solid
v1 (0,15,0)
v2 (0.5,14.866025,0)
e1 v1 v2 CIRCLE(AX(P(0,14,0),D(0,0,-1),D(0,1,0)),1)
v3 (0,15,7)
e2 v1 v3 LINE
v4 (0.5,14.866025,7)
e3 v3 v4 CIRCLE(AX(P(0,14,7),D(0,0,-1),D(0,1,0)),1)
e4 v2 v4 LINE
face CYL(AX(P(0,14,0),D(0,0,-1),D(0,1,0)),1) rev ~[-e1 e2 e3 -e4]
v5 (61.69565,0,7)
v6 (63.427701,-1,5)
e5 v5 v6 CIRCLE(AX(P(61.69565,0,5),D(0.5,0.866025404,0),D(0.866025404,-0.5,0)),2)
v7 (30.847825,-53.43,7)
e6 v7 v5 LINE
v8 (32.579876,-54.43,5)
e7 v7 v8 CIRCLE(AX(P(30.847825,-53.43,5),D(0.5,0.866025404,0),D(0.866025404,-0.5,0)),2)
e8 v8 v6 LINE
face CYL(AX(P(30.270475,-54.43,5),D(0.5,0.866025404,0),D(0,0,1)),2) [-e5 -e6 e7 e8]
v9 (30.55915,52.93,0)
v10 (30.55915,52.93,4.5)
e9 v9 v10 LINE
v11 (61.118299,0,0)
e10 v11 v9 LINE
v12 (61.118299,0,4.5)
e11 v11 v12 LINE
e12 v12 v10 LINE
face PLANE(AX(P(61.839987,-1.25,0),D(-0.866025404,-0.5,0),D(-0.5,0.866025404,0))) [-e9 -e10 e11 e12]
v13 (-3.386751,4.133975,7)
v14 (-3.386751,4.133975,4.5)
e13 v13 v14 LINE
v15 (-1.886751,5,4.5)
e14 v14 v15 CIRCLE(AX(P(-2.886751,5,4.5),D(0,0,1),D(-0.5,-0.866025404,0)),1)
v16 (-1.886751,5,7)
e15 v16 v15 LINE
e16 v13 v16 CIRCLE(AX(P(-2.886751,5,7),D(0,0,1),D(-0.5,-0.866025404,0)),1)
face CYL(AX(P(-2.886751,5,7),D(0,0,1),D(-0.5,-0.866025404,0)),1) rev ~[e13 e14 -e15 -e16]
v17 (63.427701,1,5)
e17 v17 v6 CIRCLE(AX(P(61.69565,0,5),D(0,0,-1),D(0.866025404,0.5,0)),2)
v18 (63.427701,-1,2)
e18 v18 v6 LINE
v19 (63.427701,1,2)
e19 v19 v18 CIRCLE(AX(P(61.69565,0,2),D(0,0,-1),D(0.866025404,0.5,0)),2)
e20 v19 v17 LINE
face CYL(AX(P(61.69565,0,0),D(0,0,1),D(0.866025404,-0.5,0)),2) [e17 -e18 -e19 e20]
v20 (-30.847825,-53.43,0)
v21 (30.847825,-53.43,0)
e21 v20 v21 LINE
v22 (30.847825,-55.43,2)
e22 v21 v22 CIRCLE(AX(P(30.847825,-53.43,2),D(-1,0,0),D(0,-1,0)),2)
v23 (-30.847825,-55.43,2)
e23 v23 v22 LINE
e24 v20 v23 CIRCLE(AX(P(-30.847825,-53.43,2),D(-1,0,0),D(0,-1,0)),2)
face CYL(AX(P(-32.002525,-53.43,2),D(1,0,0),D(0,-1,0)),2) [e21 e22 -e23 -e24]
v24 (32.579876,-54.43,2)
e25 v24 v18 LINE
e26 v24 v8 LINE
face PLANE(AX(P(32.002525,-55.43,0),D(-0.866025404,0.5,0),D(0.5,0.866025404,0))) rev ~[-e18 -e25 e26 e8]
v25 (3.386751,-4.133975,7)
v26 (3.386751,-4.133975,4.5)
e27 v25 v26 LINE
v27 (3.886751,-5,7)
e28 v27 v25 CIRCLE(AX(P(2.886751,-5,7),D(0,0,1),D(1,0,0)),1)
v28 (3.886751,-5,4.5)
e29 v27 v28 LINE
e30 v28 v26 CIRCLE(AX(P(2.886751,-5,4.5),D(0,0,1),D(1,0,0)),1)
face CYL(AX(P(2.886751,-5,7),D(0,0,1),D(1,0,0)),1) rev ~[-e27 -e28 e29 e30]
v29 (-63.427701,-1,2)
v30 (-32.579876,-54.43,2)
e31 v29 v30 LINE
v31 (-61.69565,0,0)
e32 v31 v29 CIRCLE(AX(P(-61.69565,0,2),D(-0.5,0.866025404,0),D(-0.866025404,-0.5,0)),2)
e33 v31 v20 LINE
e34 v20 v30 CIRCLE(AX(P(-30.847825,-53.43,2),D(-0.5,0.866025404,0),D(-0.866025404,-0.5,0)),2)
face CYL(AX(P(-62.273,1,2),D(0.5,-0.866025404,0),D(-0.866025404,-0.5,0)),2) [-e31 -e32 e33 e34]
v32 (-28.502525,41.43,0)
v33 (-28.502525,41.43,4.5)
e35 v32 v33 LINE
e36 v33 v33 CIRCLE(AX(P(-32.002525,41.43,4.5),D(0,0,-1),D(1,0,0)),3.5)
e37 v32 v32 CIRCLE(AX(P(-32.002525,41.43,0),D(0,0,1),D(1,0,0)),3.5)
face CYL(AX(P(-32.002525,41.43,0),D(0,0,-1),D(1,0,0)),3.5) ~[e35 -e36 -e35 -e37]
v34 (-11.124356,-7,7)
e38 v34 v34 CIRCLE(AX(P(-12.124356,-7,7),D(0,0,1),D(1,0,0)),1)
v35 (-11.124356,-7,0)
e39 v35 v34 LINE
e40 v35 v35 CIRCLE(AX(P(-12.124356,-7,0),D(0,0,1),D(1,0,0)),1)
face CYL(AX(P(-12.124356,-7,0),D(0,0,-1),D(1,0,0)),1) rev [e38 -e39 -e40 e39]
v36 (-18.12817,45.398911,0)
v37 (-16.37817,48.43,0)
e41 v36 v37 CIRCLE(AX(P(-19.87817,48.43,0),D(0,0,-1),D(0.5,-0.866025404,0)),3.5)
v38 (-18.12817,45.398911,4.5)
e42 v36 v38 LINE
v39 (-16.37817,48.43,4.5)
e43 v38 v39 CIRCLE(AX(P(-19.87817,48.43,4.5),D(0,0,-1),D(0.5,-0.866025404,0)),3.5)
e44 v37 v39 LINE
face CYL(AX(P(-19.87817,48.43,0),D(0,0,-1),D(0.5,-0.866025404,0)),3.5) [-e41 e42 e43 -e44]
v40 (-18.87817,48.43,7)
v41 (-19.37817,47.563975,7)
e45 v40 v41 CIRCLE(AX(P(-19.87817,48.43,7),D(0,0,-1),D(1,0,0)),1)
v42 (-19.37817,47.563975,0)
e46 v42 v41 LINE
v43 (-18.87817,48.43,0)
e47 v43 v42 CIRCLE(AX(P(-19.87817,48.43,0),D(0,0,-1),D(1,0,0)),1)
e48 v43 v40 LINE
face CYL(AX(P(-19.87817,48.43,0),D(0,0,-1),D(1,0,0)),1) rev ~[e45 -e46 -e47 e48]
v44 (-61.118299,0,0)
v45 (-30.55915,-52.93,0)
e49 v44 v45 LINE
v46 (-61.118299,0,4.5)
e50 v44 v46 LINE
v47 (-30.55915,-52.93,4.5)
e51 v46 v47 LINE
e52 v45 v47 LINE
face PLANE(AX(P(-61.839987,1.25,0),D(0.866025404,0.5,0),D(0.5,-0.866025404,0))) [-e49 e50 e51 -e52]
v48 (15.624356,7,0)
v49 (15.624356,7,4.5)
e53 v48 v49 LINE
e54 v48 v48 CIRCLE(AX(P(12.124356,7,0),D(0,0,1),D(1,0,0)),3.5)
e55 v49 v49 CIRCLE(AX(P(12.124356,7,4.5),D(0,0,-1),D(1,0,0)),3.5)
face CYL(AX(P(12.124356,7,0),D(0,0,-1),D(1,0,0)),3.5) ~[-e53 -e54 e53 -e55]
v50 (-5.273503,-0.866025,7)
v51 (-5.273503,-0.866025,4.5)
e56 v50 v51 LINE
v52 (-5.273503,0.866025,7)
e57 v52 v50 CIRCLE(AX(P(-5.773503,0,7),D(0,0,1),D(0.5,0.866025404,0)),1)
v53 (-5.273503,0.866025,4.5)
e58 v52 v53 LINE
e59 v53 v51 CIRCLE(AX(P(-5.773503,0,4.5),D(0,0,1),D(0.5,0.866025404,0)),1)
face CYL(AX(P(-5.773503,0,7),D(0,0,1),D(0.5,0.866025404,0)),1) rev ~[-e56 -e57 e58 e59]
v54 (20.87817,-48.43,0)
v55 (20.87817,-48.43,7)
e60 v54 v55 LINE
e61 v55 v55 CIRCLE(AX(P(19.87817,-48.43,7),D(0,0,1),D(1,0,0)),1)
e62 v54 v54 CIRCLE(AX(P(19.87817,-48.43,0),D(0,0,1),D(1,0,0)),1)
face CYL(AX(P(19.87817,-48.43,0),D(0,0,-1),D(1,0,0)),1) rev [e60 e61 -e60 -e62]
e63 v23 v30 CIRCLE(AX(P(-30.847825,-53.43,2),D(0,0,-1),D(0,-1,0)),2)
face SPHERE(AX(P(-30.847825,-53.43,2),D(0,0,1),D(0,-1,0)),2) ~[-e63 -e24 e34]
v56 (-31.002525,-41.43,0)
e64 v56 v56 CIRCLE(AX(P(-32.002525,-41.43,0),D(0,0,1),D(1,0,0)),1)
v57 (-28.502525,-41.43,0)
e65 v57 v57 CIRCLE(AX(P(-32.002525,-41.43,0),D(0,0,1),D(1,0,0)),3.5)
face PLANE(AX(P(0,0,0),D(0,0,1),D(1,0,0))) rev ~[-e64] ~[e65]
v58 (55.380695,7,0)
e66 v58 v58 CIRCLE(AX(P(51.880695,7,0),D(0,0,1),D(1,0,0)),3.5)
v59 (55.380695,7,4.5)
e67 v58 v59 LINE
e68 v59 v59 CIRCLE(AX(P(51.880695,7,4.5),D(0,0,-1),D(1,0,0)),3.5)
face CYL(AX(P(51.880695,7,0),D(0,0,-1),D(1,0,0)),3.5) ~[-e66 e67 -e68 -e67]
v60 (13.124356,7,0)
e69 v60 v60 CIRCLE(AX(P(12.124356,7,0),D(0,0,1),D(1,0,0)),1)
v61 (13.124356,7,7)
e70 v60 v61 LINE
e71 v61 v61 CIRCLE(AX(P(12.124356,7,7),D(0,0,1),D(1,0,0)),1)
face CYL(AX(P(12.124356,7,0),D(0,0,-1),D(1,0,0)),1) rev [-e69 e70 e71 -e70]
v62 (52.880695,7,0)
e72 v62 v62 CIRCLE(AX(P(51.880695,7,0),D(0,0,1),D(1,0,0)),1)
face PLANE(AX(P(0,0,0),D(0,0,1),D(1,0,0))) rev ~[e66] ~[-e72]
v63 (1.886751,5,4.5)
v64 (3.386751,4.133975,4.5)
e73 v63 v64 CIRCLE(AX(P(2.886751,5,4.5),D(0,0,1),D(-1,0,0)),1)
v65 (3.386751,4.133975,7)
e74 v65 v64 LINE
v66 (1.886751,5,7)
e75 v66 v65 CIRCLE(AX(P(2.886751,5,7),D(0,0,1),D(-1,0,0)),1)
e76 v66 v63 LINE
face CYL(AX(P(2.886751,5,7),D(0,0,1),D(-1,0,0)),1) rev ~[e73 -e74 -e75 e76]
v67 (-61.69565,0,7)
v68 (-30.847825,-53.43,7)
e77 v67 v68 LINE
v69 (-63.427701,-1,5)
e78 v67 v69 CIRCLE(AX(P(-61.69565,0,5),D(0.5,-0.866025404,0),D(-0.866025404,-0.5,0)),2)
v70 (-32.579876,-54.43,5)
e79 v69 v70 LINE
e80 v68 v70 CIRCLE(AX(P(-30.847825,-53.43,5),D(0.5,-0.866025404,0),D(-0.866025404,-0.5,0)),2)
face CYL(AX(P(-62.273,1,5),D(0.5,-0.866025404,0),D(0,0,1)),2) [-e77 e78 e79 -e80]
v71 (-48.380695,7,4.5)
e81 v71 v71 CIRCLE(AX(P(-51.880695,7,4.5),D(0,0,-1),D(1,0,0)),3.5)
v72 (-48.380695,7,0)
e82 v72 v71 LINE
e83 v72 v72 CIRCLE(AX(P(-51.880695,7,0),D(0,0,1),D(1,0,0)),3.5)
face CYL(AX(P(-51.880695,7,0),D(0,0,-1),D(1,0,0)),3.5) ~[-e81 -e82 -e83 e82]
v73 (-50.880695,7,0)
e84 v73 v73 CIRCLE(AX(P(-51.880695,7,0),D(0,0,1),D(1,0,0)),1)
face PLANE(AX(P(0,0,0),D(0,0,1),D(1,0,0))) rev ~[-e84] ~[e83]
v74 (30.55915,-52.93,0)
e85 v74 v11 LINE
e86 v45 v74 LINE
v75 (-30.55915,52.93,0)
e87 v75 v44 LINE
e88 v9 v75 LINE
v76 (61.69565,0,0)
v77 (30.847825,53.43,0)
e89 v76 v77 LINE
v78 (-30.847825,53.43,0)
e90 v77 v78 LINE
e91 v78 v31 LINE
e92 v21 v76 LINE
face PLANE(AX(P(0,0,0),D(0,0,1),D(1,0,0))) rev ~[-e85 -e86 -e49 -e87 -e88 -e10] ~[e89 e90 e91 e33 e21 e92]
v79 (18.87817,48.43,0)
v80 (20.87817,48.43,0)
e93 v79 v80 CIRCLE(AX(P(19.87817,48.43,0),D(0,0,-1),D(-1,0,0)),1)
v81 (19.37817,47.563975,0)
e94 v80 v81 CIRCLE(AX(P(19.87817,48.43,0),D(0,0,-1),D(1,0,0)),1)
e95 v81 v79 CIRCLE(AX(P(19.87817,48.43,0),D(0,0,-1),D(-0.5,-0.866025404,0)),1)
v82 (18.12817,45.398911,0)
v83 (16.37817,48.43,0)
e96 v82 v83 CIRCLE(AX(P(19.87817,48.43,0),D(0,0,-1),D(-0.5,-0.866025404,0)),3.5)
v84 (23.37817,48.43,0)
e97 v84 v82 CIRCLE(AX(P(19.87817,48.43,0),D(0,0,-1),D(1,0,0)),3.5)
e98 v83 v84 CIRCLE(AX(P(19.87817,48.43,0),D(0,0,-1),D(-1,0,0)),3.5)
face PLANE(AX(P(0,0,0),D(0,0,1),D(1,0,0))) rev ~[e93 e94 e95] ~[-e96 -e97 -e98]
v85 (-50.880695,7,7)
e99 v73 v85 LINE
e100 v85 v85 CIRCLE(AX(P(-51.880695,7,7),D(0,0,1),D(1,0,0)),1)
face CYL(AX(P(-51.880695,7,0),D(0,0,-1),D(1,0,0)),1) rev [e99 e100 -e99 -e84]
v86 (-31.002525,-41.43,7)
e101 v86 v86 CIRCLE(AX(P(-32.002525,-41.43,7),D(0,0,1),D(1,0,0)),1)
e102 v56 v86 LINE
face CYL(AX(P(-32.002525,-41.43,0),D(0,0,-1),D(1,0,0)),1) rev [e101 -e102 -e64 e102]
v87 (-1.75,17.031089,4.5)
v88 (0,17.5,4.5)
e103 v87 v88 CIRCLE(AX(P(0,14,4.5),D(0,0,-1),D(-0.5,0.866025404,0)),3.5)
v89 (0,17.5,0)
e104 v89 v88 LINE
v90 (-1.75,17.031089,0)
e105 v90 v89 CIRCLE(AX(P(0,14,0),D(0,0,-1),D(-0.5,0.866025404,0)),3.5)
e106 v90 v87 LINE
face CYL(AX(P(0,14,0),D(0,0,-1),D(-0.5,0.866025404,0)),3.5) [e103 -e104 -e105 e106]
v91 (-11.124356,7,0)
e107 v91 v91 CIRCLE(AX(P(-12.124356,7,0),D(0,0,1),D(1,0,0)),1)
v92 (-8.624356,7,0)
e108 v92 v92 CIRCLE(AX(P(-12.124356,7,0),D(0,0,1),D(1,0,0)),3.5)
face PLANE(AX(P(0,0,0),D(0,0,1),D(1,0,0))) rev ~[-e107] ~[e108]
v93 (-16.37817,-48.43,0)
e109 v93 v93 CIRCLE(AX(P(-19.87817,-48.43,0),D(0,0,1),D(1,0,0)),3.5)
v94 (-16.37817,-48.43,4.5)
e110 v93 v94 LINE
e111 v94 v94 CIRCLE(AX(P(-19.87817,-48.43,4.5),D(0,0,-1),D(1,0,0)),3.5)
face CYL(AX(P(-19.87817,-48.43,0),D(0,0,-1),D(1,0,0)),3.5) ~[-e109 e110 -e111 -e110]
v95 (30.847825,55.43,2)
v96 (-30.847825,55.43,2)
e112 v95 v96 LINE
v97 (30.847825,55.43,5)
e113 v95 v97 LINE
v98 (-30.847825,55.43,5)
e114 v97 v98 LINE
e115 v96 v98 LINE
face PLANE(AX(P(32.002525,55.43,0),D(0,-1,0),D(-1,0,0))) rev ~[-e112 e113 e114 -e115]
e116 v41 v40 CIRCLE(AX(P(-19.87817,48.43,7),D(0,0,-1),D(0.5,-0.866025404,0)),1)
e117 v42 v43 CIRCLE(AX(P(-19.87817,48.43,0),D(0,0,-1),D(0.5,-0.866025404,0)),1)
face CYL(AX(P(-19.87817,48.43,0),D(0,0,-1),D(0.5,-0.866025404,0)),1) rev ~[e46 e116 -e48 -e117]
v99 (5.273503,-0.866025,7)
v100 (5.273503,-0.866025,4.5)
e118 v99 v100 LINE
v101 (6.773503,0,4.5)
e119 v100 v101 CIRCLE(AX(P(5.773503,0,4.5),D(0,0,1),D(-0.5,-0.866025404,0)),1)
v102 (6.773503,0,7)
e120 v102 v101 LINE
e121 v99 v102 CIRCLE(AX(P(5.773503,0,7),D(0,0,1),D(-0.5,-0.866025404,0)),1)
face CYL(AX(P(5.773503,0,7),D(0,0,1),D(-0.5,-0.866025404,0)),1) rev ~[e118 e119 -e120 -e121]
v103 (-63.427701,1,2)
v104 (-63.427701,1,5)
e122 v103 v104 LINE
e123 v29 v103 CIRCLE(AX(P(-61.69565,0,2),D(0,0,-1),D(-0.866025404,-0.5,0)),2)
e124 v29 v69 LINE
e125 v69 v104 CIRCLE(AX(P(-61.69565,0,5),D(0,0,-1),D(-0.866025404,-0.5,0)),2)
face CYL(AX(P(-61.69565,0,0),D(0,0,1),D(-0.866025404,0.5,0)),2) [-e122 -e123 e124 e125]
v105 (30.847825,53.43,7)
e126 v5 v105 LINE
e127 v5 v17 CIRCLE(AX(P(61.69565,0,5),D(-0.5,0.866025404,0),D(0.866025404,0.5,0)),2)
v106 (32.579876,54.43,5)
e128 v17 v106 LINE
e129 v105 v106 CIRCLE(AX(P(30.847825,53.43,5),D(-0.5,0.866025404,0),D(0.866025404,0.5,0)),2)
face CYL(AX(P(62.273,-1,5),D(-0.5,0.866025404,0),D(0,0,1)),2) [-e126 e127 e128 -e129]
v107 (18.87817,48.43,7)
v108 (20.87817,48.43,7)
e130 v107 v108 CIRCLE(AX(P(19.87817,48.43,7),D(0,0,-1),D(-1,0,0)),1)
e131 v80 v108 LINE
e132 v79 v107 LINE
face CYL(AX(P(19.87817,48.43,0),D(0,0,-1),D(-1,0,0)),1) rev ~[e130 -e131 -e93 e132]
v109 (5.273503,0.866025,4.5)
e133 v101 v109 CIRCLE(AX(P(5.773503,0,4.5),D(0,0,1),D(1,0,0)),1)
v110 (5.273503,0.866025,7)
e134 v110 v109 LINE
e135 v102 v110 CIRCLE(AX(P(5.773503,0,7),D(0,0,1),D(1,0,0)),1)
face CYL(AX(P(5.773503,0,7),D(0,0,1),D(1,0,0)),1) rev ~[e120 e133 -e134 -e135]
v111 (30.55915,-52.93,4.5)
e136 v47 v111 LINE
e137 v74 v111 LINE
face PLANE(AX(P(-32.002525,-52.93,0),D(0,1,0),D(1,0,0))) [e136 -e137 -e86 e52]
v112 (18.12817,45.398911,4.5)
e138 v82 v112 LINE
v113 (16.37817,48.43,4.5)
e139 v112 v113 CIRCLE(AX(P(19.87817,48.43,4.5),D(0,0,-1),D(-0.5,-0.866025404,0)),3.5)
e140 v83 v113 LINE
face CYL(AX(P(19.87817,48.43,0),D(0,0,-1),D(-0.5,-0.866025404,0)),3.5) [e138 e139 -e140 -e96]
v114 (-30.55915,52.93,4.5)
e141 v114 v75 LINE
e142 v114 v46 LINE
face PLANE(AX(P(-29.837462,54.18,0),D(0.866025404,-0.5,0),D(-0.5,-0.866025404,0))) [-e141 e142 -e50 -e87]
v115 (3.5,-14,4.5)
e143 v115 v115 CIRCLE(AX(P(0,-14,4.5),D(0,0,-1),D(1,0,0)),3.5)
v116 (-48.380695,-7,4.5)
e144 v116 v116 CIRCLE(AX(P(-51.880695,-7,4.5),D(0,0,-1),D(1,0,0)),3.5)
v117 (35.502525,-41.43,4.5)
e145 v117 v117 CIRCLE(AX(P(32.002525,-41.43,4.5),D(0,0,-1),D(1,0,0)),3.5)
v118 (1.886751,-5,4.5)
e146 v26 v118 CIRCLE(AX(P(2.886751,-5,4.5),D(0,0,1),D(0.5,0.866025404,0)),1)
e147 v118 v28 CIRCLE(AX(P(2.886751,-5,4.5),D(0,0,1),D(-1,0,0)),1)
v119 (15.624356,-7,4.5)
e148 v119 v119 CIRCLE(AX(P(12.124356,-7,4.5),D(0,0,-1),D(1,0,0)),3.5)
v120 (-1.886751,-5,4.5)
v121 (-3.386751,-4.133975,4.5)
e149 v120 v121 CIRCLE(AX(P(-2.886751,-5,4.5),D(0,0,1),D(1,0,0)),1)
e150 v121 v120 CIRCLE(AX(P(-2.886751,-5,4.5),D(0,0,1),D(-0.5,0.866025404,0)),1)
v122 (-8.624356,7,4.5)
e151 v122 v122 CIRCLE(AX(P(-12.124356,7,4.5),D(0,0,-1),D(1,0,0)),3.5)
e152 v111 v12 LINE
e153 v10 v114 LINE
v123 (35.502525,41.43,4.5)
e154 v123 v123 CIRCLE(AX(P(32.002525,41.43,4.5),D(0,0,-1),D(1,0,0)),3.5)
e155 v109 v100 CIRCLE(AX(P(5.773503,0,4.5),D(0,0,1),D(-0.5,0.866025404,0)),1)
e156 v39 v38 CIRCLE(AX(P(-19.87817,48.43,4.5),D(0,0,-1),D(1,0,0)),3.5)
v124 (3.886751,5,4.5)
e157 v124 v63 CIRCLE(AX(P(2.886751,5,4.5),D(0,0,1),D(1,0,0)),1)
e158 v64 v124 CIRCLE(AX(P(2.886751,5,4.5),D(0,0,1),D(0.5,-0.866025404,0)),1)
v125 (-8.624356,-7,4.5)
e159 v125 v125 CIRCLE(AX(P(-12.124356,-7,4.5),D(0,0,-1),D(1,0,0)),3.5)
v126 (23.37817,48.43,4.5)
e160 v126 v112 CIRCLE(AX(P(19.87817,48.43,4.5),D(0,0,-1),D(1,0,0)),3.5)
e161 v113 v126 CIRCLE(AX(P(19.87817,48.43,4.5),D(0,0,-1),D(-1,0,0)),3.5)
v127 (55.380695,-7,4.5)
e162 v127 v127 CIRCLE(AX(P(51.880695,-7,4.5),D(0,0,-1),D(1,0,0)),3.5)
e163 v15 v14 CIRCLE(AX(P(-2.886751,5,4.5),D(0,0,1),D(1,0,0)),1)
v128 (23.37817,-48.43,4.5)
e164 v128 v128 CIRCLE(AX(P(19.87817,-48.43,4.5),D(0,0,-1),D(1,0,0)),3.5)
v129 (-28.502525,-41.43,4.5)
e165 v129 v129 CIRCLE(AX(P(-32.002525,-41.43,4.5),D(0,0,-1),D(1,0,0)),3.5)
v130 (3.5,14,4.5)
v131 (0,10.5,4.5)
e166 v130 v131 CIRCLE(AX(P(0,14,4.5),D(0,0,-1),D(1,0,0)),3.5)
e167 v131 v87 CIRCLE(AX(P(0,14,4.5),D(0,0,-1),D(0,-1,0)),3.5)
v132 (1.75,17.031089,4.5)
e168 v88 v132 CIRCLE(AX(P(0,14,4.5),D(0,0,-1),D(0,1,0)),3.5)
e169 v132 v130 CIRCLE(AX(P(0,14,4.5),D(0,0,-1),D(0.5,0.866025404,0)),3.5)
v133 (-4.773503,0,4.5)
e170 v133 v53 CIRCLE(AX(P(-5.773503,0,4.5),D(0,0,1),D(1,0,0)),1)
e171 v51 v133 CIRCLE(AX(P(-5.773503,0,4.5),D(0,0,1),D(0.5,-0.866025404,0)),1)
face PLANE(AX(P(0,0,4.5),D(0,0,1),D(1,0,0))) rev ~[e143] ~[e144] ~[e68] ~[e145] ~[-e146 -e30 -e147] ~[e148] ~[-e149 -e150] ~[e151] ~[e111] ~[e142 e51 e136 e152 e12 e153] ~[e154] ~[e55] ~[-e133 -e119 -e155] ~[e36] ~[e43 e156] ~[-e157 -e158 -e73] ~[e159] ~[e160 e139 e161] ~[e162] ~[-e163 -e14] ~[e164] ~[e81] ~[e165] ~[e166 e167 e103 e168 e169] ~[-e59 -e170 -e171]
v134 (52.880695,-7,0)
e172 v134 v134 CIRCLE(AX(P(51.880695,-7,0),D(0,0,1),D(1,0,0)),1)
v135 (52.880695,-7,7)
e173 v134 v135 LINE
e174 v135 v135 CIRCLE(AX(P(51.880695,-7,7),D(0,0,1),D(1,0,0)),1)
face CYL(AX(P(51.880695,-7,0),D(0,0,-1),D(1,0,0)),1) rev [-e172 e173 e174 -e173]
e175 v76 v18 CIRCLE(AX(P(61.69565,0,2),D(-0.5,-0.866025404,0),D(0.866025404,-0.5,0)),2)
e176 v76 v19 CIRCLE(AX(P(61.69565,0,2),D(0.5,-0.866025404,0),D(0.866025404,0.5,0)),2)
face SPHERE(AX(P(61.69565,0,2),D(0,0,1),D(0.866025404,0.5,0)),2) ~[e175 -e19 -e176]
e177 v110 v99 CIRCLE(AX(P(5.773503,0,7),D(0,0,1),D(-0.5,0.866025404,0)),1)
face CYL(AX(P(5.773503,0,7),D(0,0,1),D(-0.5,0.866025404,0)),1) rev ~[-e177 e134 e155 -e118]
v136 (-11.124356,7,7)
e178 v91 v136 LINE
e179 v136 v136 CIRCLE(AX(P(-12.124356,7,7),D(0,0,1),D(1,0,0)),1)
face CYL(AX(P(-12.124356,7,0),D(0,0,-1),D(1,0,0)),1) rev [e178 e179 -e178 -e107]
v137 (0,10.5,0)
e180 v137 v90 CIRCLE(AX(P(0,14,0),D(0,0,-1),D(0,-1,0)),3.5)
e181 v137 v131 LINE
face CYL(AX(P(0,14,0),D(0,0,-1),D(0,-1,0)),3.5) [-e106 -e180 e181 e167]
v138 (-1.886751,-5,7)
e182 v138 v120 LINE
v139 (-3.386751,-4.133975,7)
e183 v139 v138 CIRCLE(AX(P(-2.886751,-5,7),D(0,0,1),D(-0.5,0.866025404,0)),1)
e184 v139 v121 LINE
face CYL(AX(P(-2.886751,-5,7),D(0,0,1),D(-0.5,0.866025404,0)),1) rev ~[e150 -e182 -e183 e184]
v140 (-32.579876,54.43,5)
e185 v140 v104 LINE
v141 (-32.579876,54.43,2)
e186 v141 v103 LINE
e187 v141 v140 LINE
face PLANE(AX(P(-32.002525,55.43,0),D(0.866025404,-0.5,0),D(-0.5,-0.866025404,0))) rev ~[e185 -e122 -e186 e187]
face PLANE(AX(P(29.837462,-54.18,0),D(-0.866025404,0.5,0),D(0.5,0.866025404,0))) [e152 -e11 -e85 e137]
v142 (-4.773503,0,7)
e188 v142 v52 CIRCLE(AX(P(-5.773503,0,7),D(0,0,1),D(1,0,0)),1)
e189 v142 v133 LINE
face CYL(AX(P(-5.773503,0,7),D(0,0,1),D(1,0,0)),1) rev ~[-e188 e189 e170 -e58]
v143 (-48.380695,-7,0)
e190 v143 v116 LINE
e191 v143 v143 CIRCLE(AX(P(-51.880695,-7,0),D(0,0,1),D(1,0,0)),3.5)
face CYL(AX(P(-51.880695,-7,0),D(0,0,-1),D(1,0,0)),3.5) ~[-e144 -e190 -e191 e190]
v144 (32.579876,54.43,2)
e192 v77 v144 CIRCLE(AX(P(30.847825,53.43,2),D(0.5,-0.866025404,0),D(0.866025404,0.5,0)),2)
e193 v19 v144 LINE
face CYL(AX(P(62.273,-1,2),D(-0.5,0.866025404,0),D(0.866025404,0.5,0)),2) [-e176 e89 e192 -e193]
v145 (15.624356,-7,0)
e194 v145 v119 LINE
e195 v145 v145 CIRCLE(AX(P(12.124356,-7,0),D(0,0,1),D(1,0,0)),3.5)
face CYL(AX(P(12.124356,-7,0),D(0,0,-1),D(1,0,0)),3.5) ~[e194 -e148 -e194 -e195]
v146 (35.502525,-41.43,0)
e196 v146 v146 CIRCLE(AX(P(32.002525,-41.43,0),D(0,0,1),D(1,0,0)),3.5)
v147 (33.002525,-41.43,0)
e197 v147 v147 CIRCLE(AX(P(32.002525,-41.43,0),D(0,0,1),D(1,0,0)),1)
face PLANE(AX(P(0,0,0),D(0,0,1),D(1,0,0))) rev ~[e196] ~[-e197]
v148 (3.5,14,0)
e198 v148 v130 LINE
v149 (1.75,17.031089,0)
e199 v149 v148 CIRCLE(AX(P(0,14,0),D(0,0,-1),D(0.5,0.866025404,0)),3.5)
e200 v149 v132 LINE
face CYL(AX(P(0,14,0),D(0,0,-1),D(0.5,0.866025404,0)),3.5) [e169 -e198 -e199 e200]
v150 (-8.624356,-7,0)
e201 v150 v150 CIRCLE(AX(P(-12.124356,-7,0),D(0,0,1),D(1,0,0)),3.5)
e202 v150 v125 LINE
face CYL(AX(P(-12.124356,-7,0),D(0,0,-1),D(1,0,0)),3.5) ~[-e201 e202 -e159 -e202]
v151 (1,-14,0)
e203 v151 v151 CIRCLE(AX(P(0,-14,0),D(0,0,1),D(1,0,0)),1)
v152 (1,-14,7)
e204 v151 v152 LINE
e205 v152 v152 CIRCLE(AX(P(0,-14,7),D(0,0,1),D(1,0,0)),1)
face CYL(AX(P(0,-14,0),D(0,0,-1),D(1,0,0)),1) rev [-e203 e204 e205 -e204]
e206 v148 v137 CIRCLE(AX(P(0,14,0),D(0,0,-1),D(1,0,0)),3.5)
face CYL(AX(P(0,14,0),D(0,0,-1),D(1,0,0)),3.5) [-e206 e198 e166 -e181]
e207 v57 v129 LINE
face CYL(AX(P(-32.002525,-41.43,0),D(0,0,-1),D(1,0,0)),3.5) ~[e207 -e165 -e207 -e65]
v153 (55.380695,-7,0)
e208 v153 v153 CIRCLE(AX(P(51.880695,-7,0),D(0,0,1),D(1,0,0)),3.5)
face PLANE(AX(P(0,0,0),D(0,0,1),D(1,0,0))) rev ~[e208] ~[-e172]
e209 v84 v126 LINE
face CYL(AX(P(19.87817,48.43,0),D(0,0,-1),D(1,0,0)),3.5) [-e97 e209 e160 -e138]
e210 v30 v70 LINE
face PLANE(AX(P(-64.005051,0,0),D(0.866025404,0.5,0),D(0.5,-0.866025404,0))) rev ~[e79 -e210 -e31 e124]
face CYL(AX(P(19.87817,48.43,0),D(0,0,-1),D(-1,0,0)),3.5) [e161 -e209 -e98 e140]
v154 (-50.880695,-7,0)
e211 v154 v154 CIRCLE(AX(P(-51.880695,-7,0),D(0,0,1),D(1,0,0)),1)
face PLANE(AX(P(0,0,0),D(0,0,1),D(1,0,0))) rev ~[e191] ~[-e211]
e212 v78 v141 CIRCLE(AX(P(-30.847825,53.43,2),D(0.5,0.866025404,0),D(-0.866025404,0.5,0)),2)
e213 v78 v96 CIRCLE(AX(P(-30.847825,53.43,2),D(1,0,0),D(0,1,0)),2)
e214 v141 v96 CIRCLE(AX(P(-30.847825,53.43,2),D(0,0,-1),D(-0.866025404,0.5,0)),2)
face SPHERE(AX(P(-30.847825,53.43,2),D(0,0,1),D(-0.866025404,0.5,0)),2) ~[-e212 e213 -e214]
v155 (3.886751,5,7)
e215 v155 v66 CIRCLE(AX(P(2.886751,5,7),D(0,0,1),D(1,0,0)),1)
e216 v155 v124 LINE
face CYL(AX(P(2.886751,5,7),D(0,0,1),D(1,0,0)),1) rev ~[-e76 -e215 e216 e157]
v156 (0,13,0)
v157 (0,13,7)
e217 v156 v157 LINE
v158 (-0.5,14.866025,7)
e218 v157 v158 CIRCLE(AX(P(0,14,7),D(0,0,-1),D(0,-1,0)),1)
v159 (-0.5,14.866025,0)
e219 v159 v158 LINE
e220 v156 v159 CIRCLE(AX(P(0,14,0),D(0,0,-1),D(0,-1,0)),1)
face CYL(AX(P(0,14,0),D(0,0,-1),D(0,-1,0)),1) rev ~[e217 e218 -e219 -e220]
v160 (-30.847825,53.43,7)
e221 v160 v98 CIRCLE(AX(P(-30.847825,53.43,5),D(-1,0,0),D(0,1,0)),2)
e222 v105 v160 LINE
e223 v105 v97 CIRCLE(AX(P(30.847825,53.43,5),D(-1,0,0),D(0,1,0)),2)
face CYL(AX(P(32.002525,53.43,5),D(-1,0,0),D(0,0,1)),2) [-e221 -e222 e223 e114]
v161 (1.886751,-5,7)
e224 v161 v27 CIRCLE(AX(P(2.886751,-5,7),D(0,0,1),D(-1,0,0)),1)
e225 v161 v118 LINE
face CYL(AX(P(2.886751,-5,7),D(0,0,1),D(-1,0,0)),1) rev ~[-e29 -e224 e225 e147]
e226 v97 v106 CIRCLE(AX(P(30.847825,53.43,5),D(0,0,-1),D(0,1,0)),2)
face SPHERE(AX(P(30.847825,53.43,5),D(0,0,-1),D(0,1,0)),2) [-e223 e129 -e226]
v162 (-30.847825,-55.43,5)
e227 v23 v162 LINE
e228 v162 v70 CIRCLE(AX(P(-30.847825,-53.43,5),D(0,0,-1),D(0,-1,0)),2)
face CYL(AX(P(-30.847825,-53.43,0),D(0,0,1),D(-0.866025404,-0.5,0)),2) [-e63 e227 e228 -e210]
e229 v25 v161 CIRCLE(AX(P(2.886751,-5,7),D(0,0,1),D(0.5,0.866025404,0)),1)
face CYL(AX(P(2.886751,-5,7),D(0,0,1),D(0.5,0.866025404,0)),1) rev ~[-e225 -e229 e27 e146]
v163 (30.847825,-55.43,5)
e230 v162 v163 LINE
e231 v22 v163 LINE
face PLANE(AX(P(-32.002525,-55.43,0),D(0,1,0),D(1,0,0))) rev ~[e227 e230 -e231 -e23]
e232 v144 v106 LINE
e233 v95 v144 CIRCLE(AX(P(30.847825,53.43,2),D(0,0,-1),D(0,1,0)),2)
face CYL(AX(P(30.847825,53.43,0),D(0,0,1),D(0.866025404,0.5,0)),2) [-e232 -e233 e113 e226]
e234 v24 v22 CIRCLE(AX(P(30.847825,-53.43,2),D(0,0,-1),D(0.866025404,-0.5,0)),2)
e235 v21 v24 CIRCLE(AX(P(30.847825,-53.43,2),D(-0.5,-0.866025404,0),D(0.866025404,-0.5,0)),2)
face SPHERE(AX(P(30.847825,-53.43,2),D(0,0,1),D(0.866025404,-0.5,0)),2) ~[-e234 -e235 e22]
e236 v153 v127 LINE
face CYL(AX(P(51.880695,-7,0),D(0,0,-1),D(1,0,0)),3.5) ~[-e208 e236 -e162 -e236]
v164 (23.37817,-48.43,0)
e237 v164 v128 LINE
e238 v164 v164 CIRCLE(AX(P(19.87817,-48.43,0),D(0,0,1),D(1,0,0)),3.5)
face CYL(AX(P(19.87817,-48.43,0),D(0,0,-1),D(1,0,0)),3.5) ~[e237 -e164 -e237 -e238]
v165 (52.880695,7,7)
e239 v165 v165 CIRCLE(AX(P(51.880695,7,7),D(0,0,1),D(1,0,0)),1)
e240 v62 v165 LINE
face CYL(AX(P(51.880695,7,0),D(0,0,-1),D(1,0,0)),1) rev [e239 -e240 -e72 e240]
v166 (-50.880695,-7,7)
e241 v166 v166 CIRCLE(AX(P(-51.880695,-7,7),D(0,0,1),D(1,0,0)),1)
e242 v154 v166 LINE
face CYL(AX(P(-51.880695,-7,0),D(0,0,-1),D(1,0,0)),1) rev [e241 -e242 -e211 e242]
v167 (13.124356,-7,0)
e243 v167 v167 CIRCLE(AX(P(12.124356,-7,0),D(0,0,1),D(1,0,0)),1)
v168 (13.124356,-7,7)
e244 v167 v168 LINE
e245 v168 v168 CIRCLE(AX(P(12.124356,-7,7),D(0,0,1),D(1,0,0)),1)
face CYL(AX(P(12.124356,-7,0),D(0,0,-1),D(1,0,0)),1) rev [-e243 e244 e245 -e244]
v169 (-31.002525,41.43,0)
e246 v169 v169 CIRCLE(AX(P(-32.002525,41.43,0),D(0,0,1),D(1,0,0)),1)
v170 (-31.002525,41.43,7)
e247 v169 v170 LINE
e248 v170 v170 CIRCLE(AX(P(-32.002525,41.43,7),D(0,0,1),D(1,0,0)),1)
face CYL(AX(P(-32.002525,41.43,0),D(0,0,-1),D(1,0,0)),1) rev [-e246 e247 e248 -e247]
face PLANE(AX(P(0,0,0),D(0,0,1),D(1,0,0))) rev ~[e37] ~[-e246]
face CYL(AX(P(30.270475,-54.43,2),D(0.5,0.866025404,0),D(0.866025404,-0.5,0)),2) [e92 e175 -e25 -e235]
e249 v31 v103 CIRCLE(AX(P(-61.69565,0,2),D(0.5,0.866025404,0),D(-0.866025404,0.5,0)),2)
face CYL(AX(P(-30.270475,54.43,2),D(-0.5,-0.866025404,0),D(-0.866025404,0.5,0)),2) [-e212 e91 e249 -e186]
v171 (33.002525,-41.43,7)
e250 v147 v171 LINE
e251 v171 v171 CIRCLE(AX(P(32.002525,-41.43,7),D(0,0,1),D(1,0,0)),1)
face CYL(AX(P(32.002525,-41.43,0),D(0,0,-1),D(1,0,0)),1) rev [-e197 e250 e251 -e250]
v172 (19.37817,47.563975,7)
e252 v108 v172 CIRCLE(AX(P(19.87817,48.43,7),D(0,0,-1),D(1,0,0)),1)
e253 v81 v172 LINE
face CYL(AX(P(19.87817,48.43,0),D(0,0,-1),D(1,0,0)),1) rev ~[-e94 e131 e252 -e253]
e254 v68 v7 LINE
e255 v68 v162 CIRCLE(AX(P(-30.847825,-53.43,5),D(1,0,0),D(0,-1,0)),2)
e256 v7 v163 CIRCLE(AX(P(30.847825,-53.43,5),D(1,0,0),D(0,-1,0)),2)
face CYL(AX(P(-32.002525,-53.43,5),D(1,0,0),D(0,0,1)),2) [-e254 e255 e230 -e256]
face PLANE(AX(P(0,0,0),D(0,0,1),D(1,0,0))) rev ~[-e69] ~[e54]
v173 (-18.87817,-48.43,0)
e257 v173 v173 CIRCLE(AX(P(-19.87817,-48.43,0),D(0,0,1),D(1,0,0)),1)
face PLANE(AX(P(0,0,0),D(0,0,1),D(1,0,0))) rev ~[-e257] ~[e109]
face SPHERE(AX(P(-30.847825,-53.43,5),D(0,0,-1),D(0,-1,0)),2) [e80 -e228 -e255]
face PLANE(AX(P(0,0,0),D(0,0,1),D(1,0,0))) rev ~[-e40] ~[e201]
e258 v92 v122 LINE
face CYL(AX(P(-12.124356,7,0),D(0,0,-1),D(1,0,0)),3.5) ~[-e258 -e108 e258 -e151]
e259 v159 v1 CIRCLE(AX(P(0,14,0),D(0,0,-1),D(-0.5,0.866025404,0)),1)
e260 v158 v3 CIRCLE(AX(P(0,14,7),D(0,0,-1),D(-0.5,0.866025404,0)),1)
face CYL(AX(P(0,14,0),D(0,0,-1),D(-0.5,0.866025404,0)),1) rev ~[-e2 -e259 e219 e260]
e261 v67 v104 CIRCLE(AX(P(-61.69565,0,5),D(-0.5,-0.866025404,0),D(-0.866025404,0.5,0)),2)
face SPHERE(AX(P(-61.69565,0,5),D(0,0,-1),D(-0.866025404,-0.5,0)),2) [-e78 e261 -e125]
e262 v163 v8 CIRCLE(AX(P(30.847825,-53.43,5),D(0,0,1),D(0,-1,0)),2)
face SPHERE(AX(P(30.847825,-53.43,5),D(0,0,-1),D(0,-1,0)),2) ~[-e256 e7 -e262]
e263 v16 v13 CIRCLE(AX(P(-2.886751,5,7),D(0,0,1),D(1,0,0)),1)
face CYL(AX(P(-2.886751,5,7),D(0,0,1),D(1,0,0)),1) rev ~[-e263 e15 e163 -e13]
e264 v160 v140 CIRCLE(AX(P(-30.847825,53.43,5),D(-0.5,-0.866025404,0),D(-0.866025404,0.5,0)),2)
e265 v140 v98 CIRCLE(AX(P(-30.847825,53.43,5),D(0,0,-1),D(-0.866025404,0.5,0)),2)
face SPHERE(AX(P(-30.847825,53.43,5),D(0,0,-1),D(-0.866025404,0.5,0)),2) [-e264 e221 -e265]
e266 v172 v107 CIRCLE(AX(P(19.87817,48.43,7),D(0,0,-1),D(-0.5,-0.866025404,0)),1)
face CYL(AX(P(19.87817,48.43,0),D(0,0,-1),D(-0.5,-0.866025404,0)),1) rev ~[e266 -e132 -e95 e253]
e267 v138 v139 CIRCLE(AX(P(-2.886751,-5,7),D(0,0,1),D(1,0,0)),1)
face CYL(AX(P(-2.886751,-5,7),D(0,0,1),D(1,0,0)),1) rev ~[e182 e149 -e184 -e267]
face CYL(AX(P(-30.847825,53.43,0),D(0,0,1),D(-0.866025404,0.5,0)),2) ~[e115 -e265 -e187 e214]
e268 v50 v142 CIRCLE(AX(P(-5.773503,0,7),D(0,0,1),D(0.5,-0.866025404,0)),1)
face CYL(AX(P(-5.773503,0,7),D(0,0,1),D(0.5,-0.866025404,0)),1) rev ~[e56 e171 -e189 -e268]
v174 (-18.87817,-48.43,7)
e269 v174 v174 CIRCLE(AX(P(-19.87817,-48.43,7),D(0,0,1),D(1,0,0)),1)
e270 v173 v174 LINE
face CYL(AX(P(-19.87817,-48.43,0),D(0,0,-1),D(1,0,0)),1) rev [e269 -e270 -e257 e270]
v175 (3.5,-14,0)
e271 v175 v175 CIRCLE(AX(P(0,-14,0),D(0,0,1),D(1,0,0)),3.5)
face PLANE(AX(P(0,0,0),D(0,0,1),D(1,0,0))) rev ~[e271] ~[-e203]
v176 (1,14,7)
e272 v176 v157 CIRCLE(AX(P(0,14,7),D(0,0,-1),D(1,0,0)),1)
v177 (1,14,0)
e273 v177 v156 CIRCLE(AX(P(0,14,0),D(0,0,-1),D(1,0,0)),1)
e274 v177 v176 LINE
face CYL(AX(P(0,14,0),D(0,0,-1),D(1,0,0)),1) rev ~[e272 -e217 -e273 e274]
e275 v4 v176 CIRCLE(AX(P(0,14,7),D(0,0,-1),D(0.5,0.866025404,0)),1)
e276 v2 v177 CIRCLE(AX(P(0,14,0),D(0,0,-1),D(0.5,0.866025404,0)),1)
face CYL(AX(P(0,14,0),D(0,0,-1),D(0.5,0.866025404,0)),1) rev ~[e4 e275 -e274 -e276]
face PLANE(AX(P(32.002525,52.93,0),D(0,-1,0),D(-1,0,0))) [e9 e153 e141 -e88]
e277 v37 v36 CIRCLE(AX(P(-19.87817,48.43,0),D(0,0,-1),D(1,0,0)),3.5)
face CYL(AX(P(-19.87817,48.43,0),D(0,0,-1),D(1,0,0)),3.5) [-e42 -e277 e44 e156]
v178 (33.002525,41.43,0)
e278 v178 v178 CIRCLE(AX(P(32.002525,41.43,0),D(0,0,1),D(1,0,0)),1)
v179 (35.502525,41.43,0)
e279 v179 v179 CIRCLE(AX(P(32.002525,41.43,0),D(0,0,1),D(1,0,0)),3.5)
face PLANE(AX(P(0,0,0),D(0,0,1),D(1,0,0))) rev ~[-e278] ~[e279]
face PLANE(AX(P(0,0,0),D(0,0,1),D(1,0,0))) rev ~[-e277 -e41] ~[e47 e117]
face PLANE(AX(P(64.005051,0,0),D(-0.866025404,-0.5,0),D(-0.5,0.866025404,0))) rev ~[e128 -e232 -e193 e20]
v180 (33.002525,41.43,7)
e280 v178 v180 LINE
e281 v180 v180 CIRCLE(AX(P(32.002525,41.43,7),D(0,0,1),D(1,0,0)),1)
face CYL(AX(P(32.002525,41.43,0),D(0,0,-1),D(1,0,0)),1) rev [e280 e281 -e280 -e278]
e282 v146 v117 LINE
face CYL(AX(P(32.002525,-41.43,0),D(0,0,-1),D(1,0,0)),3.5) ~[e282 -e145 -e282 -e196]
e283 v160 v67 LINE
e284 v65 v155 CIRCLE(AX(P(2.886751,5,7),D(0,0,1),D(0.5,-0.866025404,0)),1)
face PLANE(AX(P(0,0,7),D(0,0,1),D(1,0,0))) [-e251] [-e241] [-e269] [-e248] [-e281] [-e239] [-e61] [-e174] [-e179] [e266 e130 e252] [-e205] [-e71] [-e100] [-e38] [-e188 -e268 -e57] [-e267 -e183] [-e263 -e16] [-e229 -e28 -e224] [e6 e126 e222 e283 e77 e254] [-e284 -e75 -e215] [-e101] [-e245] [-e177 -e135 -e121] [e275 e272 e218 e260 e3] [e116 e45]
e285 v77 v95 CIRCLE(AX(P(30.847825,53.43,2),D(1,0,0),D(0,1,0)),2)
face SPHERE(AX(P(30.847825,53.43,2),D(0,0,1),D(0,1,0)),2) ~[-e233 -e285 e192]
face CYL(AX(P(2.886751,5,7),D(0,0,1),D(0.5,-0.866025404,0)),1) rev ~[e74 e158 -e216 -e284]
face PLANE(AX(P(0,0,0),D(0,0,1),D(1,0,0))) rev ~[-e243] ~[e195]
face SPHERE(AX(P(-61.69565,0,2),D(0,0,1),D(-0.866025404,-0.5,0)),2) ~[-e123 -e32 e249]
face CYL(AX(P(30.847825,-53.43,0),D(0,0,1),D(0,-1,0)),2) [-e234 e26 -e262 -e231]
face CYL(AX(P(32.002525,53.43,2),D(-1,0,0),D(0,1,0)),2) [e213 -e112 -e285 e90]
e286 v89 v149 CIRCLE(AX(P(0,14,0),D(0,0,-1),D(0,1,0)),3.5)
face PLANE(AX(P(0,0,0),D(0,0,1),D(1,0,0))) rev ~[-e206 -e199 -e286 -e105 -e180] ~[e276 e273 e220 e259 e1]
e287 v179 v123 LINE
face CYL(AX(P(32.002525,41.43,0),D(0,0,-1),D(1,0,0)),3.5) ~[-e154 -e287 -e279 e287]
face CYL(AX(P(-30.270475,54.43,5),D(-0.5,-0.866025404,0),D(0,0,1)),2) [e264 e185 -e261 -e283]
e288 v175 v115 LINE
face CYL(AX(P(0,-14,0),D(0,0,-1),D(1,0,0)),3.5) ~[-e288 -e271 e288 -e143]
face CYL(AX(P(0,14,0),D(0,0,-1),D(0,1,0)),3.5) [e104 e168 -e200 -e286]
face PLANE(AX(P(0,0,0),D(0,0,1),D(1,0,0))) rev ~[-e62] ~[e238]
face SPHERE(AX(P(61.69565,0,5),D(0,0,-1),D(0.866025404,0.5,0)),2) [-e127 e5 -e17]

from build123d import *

# Parameters (mm, degrees)
F0_R     = 1
F1_DEPTH = 7
F2_T     = -2.5
F3_R     = 2
F5_DEPTH = 25
F6_DEPTH = 25


with BuildPart() as f1:
    # F0 (on Top) → F1 (new body)
    with BuildSketch(Plane.XY):
        Polygon((0, 0), (-32.0025254212, 55.43), (-64.0050508424, 0), (-32.0025254212, -55.43), (32.0025254212, -55.43), (64.0050508424, 0), (32.0025254212, 55.43), align=None)
        with Locations((-32.0025254212, -41.43)):
            Circle(F0_R, mode=Mode.SUBTRACT)
        with Locations((-19.8781697682, -48.43)):
            Circle(F0_R, mode=Mode.SUBTRACT)
        with Locations((-51.8806951894, -7)):
            Circle(F0_R, mode=Mode.SUBTRACT)
        with Locations((-12.124355653, -7)):
            Circle(F0_R, mode=Mode.SUBTRACT)
        with Locations((19.8781697682, -48.43)):
            Circle(F0_R, mode=Mode.SUBTRACT)
        with Locations((32.0025254212, -41.43)):
            Circle(F0_R, mode=Mode.SUBTRACT)
        with Locations((0, -14)):
            Circle(F0_R, mode=Mode.SUBTRACT)
        with Locations((12.124355653, -7)):
            Circle(F0_R, mode=Mode.SUBTRACT)
        with Locations((51.8806951894, -7)):
            Circle(F0_R, mode=Mode.SUBTRACT)
        with Locations((-51.8806951894, 7)):
            Circle(F0_R, mode=Mode.SUBTRACT)
        with Locations((-12.124355653, 7)):
            Circle(F0_R, mode=Mode.SUBTRACT)
        with Locations((-32.0025254212, 41.43)):
            Circle(F0_R, mode=Mode.SUBTRACT)
        with Locations((12.124355653, 7)):
            Circle(F0_R, mode=Mode.SUBTRACT)
        with Locations((51.8806951894, 7)):
            Circle(F0_R, mode=Mode.SUBTRACT)
        with Locations((32.0025254212, 41.43)):
            Circle(F0_R, mode=Mode.SUBTRACT)
        with BuildLine():
            Line((0, 55.43), (-32.0025254212, 55.43))
            Line((-32.0025254212, 55.43), (0, 0))
            Line((0, 0), (0, 13))
            ThreePointArc((0, 13), (-0.9659258263, 13.7411809549), (-0.5, 14.8660254038))
            Line((-0.5, 14.8660254038), (-19.3781697682, 47.5639745962))
            ThreePointArc((-19.3781697682, 47.5639745962), (-20.744195172, 48.93), (-18.8781697682, 48.43))
            Line((-18.8781697682, 48.43), (0, 48.43))
            Line((0, 48.43), (0, 55.43))
        make_face()
        with BuildLine():
            Line((32.0025254212, 55.43), (0, 55.43))
            Line((0, 55.43), (0, 48.43))
            Line((0, 48.43), (18.8781697682, 48.43))
            ThreePointArc((18.8781697682, 48.43), (19.8781697682, 49.43), (20.8781697682, 48.43))
            ThreePointArc((20.8781697682, 48.43), (20.3781697682, 47.5639745962), (19.3781697682, 47.5639745962))
            Line((19.3781697682, 47.5639745962), (0.5, 14.8660254038))
            ThreePointArc((0.5, 14.8660254038), (0.8660254038, 14.5), (1, 14))
            ThreePointArc((1, 14), (0.7071067812, 13.2928932188), (0, 13))
            Line((0, 13), (0, 0))
            Line((0, 0), (32.0025254212, 55.43))
        make_face()
        with BuildLine():
            Line((0, 15), (0, 48.43))
            Line((0, 48.43), (-18.8781697682, 48.43))
            ThreePointArc((-18.8781697682, 48.43), (-19.0121443644, 47.93), (-19.3781697682, 47.5639745962))
            Line((-19.3781697682, 47.5639745962), (-0.5, 14.8660254038))
            ThreePointArc((-0.5, 14.8660254038), (-0.2588190451, 14.9659258263), (0, 15))
        make_face()
        with BuildLine():
            Line((18.8781697682, 48.43), (0, 48.43))
            Line((0, 48.43), (0, 15))
            ThreePointArc((0, 15), (0.2588190451, 14.9659258263), (0.5, 14.8660254038))
            Line((0.5, 14.8660254038), (19.3781697682, 47.5639745962))
            ThreePointArc((19.3781697682, 47.5639745962), (19.0121443644, 47.93), (18.8781697682, 48.43))
        make_face()
    extrude(amount=F1_DEPTH)

    # F2
    f2_openings = [f1.faces().sort_by_distance(p)[0] for p in [
        (0, 0, 0),
    ]]
    offset(amount=F2_T, openings=f2_openings)

    # F3
    f3_edges = [f1.edges().sort_by_distance(p)[0] for p in [
        (0, -55.43, 7),
        (-48.003788, -27.715, 7),
        (-48.003788, 27.715, 7),
        (0, 55.43, 7),
        (48.003788, 27.715, 7),
        (48.003788, -27.715, 7),
        (48.003788, -27.715, 0),
        (0, -55.43, 0),
        (32.002525, -55.43, 3.5),
        (64.005051, 0, 3.5),
        (48.003788, 27.715, 0),
        (32.002525, 55.43, 3.5),
        (0, 55.43, 0),
        (-32.002525, 55.43, 3.5),
        (-48.003788, 27.715, 0),
        (-64.005051, 0, 3.5),
        (-48.003788, -27.715, 0),
        (-32.002525, -55.43, 3.5),
    ]]
    fillet(f3_edges, radius=F3_R)

    # F4 (on face) → F5 (cut)
    with BuildSketch(Plane.XY.offset(7)):
        with BuildLine():
            Line((-1.8867513459, 5), (-2.8867513459, 5))
            Line((-2.8867513459, 5), (-3.3867513459, 4.1339745962))
            ThreePointArc((-3.3867513459, 4.1339745962), (-2.3867513459, 4.1339745962), (-1.8867513459, 5))
        make_face()
        with BuildLine():
            Line((-3.3867513459, 4.1339745962), (-2.8867513459, 5))
            Line((-2.8867513459, 5), (-1.8867513459, 5))
            ThreePointArc((-1.8867513459, 5), (-3.3867513459, 5.8660254038), (-3.3867513459, 4.1339745962))
        make_face()
    extrude(amount=-F5_DEPTH, mode=Mode.SUBTRACT)

    # F4 (on face) → F6 (cut)
    with BuildSketch(Plane.XY.offset(7)):
        with BuildLine():
            Line((-3.3867513459, 4.1339745962), (-2.8867513459, 5))
            Line((-2.8867513459, 5), (-1.8867513459, 5))
            ThreePointArc((-1.8867513459, 5), (-3.3867513459, 5.8660254038), (-3.3867513459, 4.1339745962))
        make_face()
        with BuildLine():
            Line((-1.8867513459, 5), (-2.8867513459, 5))
            Line((-2.8867513459, 5), (-3.3867513459, 4.1339745962))
            ThreePointArc((-3.3867513459, 4.1339745962), (-2.3867513459, 4.1339745962), (-1.8867513459, 5))
        make_face()
        with BuildLine():
            Line((-5.7735026919, 0), (-5.2735026919, 0.8660254038))
            ThreePointArc((-5.2735026919, 0.8660254038), (-6.7735026919, 0), (-5.2735026919, -0.8660254038))
            Line((-5.2735026919, -0.8660254038), (-5.7735026919, 0))
        make_face()
        with BuildLine():
            ThreePointArc((-4.7735026919, 0), (-4.9074772881, 0.5), (-5.2735026919, 0.8660254038))
            Line((-5.2735026919, 0.8660254038), (-5.7735026919, 0))
            Line((-5.7735026919, 0), (-5.2735026919, -0.8660254038))
            ThreePointArc((-5.2735026919, -0.8660254038), (-4.9074772881, -0.5), (-4.7735026919, 0))
        make_face()
        with BuildLine():
            Line((-2.8867513459, -5), (-3.3867513459, -4.1339745962))
            ThreePointArc((-3.3867513459, -4.1339745962), (-3.3867513459, -5.8660254038), (-1.8867513459, -5))
            Line((-1.8867513459, -5), (-2.8867513459, -5))
        make_face()
        with BuildLine():
            ThreePointArc((-1.8867513459, -5), (-2.3867513459, -4.1339745962), (-3.3867513459, -4.1339745962))
            Line((-3.3867513459, -4.1339745962), (-2.8867513459, -5))
            Line((-2.8867513459, -5), (-1.8867513459, -5))
        make_face()
        with BuildLine():
            ThreePointArc((3.8867513459, -5), (3.7527767497, -4.5), (3.3867513459, -4.1339745962))
            Line((3.3867513459, -4.1339745962), (2.8867513459, -5))
            Line((2.8867513459, -5), (1.8867513459, -5))
            ThreePointArc((1.8867513459, -5), (2.8867513459, -6), (3.8867513459, -5))
        make_face()
        with BuildLine():
            Line((2.8867513459, -5), (3.3867513459, -4.1339745962))
            ThreePointArc((3.3867513459, -4.1339745962), (2.3867513459, -4.1339745962), (1.8867513459, -5))
            Line((1.8867513459, -5), (2.8867513459, -5))
        make_face()
        with BuildLine():
            ThreePointArc((6.7735026919, 0), (6.2735026919, 0.8660254038), (5.2735026919, 0.8660254038))
            Line((5.2735026919, 0.8660254038), (5.7735026919, 0))
            Line((5.7735026919, 0), (5.2735026919, -0.8660254038))
            ThreePointArc((5.2735026919, -0.8660254038), (6.2735026919, -0.8660254038), (6.7735026919, 0))
        make_face()
        with BuildLine():
            Line((5.7735026919, 0), (5.2735026919, 0.8660254038))
            ThreePointArc((5.2735026919, 0.8660254038), (4.7735026919, 0), (5.2735026919, -0.8660254038))
            Line((5.2735026919, -0.8660254038), (5.7735026919, 0))
        make_face()
        with BuildLine():
            Line((2.8867513459, 5), (1.8867513459, 5))
            ThreePointArc((1.8867513459, 5), (2.3867513459, 4.1339745962), (3.3867513459, 4.1339745962))
            Line((3.3867513459, 4.1339745962), (2.8867513459, 5))
        make_face()
        with BuildLine():
            ThreePointArc((3.8867513459, 5), (2.8867513459, 6), (1.8867513459, 5))
            Line((1.8867513459, 5), (2.8867513459, 5))
            Line((2.8867513459, 5), (3.3867513459, 4.1339745962))
            ThreePointArc((3.3867513459, 4.1339745962), (3.7527767497, 4.5), (3.8867513459, 5))
        make_face()
    extrude(amount=-F6_DEPTH, mode=Mode.SUBTRACT)


solid = f1.part
